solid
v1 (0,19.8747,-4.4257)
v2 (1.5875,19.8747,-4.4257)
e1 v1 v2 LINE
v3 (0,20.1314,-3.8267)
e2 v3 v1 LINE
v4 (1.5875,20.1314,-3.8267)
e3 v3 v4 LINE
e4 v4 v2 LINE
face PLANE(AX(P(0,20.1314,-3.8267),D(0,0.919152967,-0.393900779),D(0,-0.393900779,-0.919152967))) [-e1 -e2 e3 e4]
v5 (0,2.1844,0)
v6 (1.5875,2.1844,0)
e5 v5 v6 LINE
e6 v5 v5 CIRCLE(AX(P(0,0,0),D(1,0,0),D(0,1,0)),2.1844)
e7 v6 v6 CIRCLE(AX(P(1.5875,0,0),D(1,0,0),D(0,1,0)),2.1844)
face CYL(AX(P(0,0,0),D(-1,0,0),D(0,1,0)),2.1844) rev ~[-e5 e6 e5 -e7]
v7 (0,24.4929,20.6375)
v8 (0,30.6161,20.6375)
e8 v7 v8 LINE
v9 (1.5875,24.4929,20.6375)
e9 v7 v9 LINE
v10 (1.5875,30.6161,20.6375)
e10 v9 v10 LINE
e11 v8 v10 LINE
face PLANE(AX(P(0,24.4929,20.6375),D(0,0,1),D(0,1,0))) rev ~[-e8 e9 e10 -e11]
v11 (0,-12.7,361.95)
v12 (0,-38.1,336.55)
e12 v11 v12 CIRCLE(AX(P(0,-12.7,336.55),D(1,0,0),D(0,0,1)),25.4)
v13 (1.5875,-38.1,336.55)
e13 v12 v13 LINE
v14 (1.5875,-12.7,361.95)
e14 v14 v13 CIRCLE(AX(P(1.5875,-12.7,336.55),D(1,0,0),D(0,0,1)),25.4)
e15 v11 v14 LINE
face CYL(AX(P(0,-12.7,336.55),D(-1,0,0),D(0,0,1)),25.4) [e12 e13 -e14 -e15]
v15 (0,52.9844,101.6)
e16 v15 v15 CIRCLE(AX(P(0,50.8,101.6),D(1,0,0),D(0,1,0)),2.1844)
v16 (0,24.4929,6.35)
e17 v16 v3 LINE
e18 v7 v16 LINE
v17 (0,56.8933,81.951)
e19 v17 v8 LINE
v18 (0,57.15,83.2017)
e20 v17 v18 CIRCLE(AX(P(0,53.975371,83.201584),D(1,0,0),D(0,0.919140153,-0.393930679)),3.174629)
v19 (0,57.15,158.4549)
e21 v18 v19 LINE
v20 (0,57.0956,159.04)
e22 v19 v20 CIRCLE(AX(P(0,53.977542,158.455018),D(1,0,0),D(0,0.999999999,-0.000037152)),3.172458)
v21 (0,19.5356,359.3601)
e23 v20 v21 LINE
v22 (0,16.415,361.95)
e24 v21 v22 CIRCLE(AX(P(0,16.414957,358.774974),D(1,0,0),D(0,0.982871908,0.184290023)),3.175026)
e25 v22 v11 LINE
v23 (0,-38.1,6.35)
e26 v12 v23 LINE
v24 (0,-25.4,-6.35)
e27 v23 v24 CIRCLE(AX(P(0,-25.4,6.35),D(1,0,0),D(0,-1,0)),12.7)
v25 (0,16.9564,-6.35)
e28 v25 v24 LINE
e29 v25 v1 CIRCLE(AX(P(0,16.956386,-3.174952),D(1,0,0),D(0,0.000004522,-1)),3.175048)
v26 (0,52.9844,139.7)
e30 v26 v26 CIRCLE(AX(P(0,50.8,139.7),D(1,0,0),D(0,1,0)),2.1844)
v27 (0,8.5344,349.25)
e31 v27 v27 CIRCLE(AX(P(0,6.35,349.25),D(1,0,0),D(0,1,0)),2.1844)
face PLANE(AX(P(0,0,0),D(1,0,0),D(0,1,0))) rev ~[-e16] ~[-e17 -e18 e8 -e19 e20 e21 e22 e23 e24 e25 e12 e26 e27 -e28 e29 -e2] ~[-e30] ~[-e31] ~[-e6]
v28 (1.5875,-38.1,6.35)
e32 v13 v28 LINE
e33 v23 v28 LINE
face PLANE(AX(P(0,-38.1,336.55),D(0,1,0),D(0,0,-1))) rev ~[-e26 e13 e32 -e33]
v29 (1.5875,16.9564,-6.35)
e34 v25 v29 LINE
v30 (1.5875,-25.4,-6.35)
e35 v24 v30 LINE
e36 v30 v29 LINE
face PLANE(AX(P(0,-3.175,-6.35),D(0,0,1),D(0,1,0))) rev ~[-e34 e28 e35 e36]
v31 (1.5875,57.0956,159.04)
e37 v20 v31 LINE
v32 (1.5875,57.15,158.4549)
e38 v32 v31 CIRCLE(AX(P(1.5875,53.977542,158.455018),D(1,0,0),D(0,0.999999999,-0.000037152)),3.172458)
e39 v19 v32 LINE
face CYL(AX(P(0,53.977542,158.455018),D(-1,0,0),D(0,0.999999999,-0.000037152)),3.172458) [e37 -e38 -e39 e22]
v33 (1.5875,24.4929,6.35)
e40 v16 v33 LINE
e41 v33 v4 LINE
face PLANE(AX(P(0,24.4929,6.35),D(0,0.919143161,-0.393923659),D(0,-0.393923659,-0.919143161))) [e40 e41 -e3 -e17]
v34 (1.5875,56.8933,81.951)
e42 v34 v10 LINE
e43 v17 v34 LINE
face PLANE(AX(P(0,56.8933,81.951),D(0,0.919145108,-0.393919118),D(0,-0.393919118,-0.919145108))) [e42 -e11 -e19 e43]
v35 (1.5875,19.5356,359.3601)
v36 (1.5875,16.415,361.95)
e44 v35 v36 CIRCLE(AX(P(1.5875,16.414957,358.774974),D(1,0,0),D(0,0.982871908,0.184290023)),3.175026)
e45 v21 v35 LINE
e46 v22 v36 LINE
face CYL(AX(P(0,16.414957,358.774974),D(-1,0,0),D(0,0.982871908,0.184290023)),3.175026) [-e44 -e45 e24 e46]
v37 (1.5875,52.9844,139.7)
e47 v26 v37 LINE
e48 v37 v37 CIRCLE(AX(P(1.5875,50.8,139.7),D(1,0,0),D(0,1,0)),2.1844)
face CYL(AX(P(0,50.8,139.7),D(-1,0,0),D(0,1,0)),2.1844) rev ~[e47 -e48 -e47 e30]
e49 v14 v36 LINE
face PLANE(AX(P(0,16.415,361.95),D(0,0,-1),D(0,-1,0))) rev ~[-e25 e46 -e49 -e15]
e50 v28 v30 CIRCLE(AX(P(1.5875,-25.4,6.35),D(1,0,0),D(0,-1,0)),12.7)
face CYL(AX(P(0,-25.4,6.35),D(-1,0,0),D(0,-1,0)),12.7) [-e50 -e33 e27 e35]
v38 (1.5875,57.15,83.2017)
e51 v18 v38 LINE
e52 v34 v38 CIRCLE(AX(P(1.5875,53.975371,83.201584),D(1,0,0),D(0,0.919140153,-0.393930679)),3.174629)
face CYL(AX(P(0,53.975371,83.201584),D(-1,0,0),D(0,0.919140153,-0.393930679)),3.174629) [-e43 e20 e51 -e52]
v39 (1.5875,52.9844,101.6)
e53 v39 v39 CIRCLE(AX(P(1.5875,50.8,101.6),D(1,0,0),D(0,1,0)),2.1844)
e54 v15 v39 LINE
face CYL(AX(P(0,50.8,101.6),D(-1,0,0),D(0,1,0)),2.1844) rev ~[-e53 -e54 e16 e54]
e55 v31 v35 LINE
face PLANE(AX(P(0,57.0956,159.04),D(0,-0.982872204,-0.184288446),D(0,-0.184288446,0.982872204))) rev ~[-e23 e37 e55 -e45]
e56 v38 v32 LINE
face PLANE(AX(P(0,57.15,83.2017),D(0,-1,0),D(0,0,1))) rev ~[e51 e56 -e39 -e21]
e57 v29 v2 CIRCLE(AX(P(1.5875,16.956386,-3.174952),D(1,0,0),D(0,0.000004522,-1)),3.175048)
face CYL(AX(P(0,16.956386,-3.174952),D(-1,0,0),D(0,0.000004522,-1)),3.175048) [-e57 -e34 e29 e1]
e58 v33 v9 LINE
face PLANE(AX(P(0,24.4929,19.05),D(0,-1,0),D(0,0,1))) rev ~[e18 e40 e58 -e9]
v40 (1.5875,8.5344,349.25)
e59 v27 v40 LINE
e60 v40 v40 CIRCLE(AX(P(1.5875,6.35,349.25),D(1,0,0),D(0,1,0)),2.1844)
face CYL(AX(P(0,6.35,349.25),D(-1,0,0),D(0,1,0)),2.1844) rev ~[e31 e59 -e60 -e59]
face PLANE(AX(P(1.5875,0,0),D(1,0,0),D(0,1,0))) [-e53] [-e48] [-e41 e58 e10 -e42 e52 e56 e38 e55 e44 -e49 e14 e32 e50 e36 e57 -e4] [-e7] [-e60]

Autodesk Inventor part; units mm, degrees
ref_plane "YZ Plane" through (0, 0, 0) normal (1, 0, 0) x (0, 1, 0)
ref_plane "XZ Plane" through (0, 0, 0) normal (0, 1, 0) x (-1, 0, 0)
ref_plane "XY Plane" through (0, 0, 0) normal (0, 0, 1) x (1, 0, 0)
sketch "main" plane through (0, 0, 0) normal (0, 0, 1) x (1, 0, 0)
  circle A0 centre (51.9329, 240.4167) radius 2.1844
  line L0 (60.6642, 253.1167) -> (43.2017, 253.1167)
  arc A1 (32.8829, 253.1167) -> (7.4829, 227.7167) centre (32.8829, 227.7167) ccw
  line L1 (39.2329, 253.1167) -> (32.8829, 253.1167)
  line L2 (39.2329, 249.9417) -> (39.2329, 253.1167)
  line L3 (39.2329, 253.1167) -> (42.4079, 253.1167)
  line L4 (42.4079, 253.1167) -> (43.2017, 253.1167)
  arc A2 (65.1185, 250.5268) -> (61.9979, 253.1167) centre (61.9979, 249.9417) ccw
  line L5 (61.9979, 253.1167) -> (60.6642, 253.1167)
  line L6 (42.4079, -115.1833) -> (62.5393, -115.1833)
  arc A3 (7.4829, -102.4833) -> (20.1829, -115.1833) centre (20.1829, -102.4833) ccw
  line L7 (20.1829, -115.1833) -> (42.4079, -115.1833)
  arc A4 (62.5393, -115.1833) -> (65.4576, -113.259) centre (62.5393, -112.0083) ccw
  line L8 (39.2329, 249.9417) -> (39.2329, -115.1833)
  line L9 (102.7329, -25.6316) -> (102.7329, 49.6216)
  line L10 (102.6786, 50.2068) -> (65.1185, 250.5268)
  line L11 (7.4829, 227.7167) -> (7.4829, -102.4833)
  arc A5 (102.7329, 49.6216) -> (102.6786, 50.2068) centre (99.5579, 49.6216) ccw
  circle A6 centre (96.3829, 30.8667) radius 2.1844
  circle A7 centre (96.3829, -7.2333) radius 2.1844
  arc A8 (102.4762, -26.8823) -> (102.7329, -25.6316) centre (99.5579, -25.6316) ccw
  circle A9 centre (45.5829, -108.8333) radius 2.1844
  line L12 (65.7143, -112.66) -> (65.4576, -113.259)
  line L13 (70.0758, -102.4833) -> (70.0758, -92.9583)
  line L14 (102.4762, -26.8823) -> (76.199, -88.1958)
  line L15 (70.0758, -102.4833) -> (65.7143, -112.66)
  line L16 (70.0758, -102.4833) -> (70.0758, -89.7833)
  line L17 (70.0758, -102.4833) -> (70.0758, -88.1958)
  line L18 (70.0758, -88.1958) -> (76.199, -88.1958)
  point P0 (57.0821, 72.2396)
  point P1 (7.4829, 253.1167)
  point P2 (64.6329, -115.1833)
  point P3 (102.7329, -26.2833)
  dimension "d0" = 25.4
  dimension "d1" = 3.175
  dimension "d2" = 3.175
  dimension "d3" = 3.175
  dimension "d4" = 31.75
  dimension "d5" = 90
  dimension "d6" = 25.4
  dimension "d7" = 12.7
  dimension "d16" = 12.7
  dimension "d17" = 14.2875
sketch "Sketch1" plane through (0, 0, 0) normal (1, 0, 0) x (0, 1, 0)
  circle A0 centre (6.35, 349.25) radius 2.1844
  line L0 (15.0812, 361.95) -> (-2.3813, 361.95)
  arc A1 (-12.7, 361.95) -> (-38.1, 336.55) centre (-12.7, 336.55) ccw
  line L1 (-6.35, 361.95) -> (-12.7, 361.95)
  line L2 (-6.35, 358.775) -> (-6.35, 361.95)
  line L3 (-6.35, 361.95) -> (-3.175, 361.95)
  line L4 (-3.175, 361.95) -> (-2.3813, 361.95)
  arc A2 (19.5356, 359.3601) -> (16.415, 361.95) centre (16.415, 358.775) ccw
  line L5 (16.415, 361.95) -> (15.0812, 361.95)
  line L6 (-3.175, -6.35) -> (16.9564, -6.35)
  arc A3 (-38.1, 6.35) -> (-25.4, -6.35) centre (-25.4, 6.35) ccw
  line L7 (-25.4, -6.35) -> (-3.175, -6.35)
  arc A4 (16.9564, -6.35) -> (19.8747, -4.4257) centre (16.9564, -3.175) ccw
  line L8 (-6.35, 358.775) -> (-6.35, -6.35)
  line L9 (57.15, 83.2017) -> (57.15, 158.4549)
  line L10 (57.0956, 159.04) -> (19.5356, 359.3601)
  line L11 (-38.1, 336.55) -> (-38.1, 6.35)
  arc A5 (57.15, 158.4549) -> (57.0956, 159.04) centre (53.975, 158.4549) ccw
  circle A6 centre (50.8, 139.7) radius 2.1844
  circle A7 centre (50.8, 101.6) radius 2.1844
  arc A8 (56.8933, 81.951) -> (57.15, 83.2017) centre (53.975, 83.2017) ccw
  circle A9 centre (0, 0) radius 2.1844
  line L12 (20.1314, -3.8267) -> (19.8747, -4.4257)
  line L13 (24.4929, 6.35) -> (24.4929, 15.875)
  line L14 (56.8933, 81.951) -> (30.6161, 20.6375)
  line L15 (24.4929, 6.35) -> (20.1314, -3.8267)
  line L16 (24.4929, 6.35) -> (24.4929, 19.05)
  line L17 (24.4929, 6.35) -> (24.4929, 20.6375)
  line L18 (24.4929, 20.6375) -> (30.6161, 20.6375)
  point P0 (24.4929, 15.875)
  point P1 (24.4929, 19.05)
extrude "Extrusion1" add sketch "Sketch1" along normal blind 1.5875
feature "Bend Part1" [suppressed]
equation "\"BendRadius\" = Thickness"
equation "\"BendReliefWidth\" = Thickness"
equation "\"BendReliefDepth\" = 0.5 * Thickness"
equation "\"CornerReliefSize\" = 4 * Thickness"
equation "\"MinimumRemnant\" = 2 * Thickness"
equation "\"TransitionRadius\" = BendRadius"
equation "\"JacobiRadiusSize\" = BendRadius"
equation "\"GapSize\" = Thickness"
equation "\"Thickness\" = 1.5875"
properties part number "side_panel" material "Acetal Resin, White"
